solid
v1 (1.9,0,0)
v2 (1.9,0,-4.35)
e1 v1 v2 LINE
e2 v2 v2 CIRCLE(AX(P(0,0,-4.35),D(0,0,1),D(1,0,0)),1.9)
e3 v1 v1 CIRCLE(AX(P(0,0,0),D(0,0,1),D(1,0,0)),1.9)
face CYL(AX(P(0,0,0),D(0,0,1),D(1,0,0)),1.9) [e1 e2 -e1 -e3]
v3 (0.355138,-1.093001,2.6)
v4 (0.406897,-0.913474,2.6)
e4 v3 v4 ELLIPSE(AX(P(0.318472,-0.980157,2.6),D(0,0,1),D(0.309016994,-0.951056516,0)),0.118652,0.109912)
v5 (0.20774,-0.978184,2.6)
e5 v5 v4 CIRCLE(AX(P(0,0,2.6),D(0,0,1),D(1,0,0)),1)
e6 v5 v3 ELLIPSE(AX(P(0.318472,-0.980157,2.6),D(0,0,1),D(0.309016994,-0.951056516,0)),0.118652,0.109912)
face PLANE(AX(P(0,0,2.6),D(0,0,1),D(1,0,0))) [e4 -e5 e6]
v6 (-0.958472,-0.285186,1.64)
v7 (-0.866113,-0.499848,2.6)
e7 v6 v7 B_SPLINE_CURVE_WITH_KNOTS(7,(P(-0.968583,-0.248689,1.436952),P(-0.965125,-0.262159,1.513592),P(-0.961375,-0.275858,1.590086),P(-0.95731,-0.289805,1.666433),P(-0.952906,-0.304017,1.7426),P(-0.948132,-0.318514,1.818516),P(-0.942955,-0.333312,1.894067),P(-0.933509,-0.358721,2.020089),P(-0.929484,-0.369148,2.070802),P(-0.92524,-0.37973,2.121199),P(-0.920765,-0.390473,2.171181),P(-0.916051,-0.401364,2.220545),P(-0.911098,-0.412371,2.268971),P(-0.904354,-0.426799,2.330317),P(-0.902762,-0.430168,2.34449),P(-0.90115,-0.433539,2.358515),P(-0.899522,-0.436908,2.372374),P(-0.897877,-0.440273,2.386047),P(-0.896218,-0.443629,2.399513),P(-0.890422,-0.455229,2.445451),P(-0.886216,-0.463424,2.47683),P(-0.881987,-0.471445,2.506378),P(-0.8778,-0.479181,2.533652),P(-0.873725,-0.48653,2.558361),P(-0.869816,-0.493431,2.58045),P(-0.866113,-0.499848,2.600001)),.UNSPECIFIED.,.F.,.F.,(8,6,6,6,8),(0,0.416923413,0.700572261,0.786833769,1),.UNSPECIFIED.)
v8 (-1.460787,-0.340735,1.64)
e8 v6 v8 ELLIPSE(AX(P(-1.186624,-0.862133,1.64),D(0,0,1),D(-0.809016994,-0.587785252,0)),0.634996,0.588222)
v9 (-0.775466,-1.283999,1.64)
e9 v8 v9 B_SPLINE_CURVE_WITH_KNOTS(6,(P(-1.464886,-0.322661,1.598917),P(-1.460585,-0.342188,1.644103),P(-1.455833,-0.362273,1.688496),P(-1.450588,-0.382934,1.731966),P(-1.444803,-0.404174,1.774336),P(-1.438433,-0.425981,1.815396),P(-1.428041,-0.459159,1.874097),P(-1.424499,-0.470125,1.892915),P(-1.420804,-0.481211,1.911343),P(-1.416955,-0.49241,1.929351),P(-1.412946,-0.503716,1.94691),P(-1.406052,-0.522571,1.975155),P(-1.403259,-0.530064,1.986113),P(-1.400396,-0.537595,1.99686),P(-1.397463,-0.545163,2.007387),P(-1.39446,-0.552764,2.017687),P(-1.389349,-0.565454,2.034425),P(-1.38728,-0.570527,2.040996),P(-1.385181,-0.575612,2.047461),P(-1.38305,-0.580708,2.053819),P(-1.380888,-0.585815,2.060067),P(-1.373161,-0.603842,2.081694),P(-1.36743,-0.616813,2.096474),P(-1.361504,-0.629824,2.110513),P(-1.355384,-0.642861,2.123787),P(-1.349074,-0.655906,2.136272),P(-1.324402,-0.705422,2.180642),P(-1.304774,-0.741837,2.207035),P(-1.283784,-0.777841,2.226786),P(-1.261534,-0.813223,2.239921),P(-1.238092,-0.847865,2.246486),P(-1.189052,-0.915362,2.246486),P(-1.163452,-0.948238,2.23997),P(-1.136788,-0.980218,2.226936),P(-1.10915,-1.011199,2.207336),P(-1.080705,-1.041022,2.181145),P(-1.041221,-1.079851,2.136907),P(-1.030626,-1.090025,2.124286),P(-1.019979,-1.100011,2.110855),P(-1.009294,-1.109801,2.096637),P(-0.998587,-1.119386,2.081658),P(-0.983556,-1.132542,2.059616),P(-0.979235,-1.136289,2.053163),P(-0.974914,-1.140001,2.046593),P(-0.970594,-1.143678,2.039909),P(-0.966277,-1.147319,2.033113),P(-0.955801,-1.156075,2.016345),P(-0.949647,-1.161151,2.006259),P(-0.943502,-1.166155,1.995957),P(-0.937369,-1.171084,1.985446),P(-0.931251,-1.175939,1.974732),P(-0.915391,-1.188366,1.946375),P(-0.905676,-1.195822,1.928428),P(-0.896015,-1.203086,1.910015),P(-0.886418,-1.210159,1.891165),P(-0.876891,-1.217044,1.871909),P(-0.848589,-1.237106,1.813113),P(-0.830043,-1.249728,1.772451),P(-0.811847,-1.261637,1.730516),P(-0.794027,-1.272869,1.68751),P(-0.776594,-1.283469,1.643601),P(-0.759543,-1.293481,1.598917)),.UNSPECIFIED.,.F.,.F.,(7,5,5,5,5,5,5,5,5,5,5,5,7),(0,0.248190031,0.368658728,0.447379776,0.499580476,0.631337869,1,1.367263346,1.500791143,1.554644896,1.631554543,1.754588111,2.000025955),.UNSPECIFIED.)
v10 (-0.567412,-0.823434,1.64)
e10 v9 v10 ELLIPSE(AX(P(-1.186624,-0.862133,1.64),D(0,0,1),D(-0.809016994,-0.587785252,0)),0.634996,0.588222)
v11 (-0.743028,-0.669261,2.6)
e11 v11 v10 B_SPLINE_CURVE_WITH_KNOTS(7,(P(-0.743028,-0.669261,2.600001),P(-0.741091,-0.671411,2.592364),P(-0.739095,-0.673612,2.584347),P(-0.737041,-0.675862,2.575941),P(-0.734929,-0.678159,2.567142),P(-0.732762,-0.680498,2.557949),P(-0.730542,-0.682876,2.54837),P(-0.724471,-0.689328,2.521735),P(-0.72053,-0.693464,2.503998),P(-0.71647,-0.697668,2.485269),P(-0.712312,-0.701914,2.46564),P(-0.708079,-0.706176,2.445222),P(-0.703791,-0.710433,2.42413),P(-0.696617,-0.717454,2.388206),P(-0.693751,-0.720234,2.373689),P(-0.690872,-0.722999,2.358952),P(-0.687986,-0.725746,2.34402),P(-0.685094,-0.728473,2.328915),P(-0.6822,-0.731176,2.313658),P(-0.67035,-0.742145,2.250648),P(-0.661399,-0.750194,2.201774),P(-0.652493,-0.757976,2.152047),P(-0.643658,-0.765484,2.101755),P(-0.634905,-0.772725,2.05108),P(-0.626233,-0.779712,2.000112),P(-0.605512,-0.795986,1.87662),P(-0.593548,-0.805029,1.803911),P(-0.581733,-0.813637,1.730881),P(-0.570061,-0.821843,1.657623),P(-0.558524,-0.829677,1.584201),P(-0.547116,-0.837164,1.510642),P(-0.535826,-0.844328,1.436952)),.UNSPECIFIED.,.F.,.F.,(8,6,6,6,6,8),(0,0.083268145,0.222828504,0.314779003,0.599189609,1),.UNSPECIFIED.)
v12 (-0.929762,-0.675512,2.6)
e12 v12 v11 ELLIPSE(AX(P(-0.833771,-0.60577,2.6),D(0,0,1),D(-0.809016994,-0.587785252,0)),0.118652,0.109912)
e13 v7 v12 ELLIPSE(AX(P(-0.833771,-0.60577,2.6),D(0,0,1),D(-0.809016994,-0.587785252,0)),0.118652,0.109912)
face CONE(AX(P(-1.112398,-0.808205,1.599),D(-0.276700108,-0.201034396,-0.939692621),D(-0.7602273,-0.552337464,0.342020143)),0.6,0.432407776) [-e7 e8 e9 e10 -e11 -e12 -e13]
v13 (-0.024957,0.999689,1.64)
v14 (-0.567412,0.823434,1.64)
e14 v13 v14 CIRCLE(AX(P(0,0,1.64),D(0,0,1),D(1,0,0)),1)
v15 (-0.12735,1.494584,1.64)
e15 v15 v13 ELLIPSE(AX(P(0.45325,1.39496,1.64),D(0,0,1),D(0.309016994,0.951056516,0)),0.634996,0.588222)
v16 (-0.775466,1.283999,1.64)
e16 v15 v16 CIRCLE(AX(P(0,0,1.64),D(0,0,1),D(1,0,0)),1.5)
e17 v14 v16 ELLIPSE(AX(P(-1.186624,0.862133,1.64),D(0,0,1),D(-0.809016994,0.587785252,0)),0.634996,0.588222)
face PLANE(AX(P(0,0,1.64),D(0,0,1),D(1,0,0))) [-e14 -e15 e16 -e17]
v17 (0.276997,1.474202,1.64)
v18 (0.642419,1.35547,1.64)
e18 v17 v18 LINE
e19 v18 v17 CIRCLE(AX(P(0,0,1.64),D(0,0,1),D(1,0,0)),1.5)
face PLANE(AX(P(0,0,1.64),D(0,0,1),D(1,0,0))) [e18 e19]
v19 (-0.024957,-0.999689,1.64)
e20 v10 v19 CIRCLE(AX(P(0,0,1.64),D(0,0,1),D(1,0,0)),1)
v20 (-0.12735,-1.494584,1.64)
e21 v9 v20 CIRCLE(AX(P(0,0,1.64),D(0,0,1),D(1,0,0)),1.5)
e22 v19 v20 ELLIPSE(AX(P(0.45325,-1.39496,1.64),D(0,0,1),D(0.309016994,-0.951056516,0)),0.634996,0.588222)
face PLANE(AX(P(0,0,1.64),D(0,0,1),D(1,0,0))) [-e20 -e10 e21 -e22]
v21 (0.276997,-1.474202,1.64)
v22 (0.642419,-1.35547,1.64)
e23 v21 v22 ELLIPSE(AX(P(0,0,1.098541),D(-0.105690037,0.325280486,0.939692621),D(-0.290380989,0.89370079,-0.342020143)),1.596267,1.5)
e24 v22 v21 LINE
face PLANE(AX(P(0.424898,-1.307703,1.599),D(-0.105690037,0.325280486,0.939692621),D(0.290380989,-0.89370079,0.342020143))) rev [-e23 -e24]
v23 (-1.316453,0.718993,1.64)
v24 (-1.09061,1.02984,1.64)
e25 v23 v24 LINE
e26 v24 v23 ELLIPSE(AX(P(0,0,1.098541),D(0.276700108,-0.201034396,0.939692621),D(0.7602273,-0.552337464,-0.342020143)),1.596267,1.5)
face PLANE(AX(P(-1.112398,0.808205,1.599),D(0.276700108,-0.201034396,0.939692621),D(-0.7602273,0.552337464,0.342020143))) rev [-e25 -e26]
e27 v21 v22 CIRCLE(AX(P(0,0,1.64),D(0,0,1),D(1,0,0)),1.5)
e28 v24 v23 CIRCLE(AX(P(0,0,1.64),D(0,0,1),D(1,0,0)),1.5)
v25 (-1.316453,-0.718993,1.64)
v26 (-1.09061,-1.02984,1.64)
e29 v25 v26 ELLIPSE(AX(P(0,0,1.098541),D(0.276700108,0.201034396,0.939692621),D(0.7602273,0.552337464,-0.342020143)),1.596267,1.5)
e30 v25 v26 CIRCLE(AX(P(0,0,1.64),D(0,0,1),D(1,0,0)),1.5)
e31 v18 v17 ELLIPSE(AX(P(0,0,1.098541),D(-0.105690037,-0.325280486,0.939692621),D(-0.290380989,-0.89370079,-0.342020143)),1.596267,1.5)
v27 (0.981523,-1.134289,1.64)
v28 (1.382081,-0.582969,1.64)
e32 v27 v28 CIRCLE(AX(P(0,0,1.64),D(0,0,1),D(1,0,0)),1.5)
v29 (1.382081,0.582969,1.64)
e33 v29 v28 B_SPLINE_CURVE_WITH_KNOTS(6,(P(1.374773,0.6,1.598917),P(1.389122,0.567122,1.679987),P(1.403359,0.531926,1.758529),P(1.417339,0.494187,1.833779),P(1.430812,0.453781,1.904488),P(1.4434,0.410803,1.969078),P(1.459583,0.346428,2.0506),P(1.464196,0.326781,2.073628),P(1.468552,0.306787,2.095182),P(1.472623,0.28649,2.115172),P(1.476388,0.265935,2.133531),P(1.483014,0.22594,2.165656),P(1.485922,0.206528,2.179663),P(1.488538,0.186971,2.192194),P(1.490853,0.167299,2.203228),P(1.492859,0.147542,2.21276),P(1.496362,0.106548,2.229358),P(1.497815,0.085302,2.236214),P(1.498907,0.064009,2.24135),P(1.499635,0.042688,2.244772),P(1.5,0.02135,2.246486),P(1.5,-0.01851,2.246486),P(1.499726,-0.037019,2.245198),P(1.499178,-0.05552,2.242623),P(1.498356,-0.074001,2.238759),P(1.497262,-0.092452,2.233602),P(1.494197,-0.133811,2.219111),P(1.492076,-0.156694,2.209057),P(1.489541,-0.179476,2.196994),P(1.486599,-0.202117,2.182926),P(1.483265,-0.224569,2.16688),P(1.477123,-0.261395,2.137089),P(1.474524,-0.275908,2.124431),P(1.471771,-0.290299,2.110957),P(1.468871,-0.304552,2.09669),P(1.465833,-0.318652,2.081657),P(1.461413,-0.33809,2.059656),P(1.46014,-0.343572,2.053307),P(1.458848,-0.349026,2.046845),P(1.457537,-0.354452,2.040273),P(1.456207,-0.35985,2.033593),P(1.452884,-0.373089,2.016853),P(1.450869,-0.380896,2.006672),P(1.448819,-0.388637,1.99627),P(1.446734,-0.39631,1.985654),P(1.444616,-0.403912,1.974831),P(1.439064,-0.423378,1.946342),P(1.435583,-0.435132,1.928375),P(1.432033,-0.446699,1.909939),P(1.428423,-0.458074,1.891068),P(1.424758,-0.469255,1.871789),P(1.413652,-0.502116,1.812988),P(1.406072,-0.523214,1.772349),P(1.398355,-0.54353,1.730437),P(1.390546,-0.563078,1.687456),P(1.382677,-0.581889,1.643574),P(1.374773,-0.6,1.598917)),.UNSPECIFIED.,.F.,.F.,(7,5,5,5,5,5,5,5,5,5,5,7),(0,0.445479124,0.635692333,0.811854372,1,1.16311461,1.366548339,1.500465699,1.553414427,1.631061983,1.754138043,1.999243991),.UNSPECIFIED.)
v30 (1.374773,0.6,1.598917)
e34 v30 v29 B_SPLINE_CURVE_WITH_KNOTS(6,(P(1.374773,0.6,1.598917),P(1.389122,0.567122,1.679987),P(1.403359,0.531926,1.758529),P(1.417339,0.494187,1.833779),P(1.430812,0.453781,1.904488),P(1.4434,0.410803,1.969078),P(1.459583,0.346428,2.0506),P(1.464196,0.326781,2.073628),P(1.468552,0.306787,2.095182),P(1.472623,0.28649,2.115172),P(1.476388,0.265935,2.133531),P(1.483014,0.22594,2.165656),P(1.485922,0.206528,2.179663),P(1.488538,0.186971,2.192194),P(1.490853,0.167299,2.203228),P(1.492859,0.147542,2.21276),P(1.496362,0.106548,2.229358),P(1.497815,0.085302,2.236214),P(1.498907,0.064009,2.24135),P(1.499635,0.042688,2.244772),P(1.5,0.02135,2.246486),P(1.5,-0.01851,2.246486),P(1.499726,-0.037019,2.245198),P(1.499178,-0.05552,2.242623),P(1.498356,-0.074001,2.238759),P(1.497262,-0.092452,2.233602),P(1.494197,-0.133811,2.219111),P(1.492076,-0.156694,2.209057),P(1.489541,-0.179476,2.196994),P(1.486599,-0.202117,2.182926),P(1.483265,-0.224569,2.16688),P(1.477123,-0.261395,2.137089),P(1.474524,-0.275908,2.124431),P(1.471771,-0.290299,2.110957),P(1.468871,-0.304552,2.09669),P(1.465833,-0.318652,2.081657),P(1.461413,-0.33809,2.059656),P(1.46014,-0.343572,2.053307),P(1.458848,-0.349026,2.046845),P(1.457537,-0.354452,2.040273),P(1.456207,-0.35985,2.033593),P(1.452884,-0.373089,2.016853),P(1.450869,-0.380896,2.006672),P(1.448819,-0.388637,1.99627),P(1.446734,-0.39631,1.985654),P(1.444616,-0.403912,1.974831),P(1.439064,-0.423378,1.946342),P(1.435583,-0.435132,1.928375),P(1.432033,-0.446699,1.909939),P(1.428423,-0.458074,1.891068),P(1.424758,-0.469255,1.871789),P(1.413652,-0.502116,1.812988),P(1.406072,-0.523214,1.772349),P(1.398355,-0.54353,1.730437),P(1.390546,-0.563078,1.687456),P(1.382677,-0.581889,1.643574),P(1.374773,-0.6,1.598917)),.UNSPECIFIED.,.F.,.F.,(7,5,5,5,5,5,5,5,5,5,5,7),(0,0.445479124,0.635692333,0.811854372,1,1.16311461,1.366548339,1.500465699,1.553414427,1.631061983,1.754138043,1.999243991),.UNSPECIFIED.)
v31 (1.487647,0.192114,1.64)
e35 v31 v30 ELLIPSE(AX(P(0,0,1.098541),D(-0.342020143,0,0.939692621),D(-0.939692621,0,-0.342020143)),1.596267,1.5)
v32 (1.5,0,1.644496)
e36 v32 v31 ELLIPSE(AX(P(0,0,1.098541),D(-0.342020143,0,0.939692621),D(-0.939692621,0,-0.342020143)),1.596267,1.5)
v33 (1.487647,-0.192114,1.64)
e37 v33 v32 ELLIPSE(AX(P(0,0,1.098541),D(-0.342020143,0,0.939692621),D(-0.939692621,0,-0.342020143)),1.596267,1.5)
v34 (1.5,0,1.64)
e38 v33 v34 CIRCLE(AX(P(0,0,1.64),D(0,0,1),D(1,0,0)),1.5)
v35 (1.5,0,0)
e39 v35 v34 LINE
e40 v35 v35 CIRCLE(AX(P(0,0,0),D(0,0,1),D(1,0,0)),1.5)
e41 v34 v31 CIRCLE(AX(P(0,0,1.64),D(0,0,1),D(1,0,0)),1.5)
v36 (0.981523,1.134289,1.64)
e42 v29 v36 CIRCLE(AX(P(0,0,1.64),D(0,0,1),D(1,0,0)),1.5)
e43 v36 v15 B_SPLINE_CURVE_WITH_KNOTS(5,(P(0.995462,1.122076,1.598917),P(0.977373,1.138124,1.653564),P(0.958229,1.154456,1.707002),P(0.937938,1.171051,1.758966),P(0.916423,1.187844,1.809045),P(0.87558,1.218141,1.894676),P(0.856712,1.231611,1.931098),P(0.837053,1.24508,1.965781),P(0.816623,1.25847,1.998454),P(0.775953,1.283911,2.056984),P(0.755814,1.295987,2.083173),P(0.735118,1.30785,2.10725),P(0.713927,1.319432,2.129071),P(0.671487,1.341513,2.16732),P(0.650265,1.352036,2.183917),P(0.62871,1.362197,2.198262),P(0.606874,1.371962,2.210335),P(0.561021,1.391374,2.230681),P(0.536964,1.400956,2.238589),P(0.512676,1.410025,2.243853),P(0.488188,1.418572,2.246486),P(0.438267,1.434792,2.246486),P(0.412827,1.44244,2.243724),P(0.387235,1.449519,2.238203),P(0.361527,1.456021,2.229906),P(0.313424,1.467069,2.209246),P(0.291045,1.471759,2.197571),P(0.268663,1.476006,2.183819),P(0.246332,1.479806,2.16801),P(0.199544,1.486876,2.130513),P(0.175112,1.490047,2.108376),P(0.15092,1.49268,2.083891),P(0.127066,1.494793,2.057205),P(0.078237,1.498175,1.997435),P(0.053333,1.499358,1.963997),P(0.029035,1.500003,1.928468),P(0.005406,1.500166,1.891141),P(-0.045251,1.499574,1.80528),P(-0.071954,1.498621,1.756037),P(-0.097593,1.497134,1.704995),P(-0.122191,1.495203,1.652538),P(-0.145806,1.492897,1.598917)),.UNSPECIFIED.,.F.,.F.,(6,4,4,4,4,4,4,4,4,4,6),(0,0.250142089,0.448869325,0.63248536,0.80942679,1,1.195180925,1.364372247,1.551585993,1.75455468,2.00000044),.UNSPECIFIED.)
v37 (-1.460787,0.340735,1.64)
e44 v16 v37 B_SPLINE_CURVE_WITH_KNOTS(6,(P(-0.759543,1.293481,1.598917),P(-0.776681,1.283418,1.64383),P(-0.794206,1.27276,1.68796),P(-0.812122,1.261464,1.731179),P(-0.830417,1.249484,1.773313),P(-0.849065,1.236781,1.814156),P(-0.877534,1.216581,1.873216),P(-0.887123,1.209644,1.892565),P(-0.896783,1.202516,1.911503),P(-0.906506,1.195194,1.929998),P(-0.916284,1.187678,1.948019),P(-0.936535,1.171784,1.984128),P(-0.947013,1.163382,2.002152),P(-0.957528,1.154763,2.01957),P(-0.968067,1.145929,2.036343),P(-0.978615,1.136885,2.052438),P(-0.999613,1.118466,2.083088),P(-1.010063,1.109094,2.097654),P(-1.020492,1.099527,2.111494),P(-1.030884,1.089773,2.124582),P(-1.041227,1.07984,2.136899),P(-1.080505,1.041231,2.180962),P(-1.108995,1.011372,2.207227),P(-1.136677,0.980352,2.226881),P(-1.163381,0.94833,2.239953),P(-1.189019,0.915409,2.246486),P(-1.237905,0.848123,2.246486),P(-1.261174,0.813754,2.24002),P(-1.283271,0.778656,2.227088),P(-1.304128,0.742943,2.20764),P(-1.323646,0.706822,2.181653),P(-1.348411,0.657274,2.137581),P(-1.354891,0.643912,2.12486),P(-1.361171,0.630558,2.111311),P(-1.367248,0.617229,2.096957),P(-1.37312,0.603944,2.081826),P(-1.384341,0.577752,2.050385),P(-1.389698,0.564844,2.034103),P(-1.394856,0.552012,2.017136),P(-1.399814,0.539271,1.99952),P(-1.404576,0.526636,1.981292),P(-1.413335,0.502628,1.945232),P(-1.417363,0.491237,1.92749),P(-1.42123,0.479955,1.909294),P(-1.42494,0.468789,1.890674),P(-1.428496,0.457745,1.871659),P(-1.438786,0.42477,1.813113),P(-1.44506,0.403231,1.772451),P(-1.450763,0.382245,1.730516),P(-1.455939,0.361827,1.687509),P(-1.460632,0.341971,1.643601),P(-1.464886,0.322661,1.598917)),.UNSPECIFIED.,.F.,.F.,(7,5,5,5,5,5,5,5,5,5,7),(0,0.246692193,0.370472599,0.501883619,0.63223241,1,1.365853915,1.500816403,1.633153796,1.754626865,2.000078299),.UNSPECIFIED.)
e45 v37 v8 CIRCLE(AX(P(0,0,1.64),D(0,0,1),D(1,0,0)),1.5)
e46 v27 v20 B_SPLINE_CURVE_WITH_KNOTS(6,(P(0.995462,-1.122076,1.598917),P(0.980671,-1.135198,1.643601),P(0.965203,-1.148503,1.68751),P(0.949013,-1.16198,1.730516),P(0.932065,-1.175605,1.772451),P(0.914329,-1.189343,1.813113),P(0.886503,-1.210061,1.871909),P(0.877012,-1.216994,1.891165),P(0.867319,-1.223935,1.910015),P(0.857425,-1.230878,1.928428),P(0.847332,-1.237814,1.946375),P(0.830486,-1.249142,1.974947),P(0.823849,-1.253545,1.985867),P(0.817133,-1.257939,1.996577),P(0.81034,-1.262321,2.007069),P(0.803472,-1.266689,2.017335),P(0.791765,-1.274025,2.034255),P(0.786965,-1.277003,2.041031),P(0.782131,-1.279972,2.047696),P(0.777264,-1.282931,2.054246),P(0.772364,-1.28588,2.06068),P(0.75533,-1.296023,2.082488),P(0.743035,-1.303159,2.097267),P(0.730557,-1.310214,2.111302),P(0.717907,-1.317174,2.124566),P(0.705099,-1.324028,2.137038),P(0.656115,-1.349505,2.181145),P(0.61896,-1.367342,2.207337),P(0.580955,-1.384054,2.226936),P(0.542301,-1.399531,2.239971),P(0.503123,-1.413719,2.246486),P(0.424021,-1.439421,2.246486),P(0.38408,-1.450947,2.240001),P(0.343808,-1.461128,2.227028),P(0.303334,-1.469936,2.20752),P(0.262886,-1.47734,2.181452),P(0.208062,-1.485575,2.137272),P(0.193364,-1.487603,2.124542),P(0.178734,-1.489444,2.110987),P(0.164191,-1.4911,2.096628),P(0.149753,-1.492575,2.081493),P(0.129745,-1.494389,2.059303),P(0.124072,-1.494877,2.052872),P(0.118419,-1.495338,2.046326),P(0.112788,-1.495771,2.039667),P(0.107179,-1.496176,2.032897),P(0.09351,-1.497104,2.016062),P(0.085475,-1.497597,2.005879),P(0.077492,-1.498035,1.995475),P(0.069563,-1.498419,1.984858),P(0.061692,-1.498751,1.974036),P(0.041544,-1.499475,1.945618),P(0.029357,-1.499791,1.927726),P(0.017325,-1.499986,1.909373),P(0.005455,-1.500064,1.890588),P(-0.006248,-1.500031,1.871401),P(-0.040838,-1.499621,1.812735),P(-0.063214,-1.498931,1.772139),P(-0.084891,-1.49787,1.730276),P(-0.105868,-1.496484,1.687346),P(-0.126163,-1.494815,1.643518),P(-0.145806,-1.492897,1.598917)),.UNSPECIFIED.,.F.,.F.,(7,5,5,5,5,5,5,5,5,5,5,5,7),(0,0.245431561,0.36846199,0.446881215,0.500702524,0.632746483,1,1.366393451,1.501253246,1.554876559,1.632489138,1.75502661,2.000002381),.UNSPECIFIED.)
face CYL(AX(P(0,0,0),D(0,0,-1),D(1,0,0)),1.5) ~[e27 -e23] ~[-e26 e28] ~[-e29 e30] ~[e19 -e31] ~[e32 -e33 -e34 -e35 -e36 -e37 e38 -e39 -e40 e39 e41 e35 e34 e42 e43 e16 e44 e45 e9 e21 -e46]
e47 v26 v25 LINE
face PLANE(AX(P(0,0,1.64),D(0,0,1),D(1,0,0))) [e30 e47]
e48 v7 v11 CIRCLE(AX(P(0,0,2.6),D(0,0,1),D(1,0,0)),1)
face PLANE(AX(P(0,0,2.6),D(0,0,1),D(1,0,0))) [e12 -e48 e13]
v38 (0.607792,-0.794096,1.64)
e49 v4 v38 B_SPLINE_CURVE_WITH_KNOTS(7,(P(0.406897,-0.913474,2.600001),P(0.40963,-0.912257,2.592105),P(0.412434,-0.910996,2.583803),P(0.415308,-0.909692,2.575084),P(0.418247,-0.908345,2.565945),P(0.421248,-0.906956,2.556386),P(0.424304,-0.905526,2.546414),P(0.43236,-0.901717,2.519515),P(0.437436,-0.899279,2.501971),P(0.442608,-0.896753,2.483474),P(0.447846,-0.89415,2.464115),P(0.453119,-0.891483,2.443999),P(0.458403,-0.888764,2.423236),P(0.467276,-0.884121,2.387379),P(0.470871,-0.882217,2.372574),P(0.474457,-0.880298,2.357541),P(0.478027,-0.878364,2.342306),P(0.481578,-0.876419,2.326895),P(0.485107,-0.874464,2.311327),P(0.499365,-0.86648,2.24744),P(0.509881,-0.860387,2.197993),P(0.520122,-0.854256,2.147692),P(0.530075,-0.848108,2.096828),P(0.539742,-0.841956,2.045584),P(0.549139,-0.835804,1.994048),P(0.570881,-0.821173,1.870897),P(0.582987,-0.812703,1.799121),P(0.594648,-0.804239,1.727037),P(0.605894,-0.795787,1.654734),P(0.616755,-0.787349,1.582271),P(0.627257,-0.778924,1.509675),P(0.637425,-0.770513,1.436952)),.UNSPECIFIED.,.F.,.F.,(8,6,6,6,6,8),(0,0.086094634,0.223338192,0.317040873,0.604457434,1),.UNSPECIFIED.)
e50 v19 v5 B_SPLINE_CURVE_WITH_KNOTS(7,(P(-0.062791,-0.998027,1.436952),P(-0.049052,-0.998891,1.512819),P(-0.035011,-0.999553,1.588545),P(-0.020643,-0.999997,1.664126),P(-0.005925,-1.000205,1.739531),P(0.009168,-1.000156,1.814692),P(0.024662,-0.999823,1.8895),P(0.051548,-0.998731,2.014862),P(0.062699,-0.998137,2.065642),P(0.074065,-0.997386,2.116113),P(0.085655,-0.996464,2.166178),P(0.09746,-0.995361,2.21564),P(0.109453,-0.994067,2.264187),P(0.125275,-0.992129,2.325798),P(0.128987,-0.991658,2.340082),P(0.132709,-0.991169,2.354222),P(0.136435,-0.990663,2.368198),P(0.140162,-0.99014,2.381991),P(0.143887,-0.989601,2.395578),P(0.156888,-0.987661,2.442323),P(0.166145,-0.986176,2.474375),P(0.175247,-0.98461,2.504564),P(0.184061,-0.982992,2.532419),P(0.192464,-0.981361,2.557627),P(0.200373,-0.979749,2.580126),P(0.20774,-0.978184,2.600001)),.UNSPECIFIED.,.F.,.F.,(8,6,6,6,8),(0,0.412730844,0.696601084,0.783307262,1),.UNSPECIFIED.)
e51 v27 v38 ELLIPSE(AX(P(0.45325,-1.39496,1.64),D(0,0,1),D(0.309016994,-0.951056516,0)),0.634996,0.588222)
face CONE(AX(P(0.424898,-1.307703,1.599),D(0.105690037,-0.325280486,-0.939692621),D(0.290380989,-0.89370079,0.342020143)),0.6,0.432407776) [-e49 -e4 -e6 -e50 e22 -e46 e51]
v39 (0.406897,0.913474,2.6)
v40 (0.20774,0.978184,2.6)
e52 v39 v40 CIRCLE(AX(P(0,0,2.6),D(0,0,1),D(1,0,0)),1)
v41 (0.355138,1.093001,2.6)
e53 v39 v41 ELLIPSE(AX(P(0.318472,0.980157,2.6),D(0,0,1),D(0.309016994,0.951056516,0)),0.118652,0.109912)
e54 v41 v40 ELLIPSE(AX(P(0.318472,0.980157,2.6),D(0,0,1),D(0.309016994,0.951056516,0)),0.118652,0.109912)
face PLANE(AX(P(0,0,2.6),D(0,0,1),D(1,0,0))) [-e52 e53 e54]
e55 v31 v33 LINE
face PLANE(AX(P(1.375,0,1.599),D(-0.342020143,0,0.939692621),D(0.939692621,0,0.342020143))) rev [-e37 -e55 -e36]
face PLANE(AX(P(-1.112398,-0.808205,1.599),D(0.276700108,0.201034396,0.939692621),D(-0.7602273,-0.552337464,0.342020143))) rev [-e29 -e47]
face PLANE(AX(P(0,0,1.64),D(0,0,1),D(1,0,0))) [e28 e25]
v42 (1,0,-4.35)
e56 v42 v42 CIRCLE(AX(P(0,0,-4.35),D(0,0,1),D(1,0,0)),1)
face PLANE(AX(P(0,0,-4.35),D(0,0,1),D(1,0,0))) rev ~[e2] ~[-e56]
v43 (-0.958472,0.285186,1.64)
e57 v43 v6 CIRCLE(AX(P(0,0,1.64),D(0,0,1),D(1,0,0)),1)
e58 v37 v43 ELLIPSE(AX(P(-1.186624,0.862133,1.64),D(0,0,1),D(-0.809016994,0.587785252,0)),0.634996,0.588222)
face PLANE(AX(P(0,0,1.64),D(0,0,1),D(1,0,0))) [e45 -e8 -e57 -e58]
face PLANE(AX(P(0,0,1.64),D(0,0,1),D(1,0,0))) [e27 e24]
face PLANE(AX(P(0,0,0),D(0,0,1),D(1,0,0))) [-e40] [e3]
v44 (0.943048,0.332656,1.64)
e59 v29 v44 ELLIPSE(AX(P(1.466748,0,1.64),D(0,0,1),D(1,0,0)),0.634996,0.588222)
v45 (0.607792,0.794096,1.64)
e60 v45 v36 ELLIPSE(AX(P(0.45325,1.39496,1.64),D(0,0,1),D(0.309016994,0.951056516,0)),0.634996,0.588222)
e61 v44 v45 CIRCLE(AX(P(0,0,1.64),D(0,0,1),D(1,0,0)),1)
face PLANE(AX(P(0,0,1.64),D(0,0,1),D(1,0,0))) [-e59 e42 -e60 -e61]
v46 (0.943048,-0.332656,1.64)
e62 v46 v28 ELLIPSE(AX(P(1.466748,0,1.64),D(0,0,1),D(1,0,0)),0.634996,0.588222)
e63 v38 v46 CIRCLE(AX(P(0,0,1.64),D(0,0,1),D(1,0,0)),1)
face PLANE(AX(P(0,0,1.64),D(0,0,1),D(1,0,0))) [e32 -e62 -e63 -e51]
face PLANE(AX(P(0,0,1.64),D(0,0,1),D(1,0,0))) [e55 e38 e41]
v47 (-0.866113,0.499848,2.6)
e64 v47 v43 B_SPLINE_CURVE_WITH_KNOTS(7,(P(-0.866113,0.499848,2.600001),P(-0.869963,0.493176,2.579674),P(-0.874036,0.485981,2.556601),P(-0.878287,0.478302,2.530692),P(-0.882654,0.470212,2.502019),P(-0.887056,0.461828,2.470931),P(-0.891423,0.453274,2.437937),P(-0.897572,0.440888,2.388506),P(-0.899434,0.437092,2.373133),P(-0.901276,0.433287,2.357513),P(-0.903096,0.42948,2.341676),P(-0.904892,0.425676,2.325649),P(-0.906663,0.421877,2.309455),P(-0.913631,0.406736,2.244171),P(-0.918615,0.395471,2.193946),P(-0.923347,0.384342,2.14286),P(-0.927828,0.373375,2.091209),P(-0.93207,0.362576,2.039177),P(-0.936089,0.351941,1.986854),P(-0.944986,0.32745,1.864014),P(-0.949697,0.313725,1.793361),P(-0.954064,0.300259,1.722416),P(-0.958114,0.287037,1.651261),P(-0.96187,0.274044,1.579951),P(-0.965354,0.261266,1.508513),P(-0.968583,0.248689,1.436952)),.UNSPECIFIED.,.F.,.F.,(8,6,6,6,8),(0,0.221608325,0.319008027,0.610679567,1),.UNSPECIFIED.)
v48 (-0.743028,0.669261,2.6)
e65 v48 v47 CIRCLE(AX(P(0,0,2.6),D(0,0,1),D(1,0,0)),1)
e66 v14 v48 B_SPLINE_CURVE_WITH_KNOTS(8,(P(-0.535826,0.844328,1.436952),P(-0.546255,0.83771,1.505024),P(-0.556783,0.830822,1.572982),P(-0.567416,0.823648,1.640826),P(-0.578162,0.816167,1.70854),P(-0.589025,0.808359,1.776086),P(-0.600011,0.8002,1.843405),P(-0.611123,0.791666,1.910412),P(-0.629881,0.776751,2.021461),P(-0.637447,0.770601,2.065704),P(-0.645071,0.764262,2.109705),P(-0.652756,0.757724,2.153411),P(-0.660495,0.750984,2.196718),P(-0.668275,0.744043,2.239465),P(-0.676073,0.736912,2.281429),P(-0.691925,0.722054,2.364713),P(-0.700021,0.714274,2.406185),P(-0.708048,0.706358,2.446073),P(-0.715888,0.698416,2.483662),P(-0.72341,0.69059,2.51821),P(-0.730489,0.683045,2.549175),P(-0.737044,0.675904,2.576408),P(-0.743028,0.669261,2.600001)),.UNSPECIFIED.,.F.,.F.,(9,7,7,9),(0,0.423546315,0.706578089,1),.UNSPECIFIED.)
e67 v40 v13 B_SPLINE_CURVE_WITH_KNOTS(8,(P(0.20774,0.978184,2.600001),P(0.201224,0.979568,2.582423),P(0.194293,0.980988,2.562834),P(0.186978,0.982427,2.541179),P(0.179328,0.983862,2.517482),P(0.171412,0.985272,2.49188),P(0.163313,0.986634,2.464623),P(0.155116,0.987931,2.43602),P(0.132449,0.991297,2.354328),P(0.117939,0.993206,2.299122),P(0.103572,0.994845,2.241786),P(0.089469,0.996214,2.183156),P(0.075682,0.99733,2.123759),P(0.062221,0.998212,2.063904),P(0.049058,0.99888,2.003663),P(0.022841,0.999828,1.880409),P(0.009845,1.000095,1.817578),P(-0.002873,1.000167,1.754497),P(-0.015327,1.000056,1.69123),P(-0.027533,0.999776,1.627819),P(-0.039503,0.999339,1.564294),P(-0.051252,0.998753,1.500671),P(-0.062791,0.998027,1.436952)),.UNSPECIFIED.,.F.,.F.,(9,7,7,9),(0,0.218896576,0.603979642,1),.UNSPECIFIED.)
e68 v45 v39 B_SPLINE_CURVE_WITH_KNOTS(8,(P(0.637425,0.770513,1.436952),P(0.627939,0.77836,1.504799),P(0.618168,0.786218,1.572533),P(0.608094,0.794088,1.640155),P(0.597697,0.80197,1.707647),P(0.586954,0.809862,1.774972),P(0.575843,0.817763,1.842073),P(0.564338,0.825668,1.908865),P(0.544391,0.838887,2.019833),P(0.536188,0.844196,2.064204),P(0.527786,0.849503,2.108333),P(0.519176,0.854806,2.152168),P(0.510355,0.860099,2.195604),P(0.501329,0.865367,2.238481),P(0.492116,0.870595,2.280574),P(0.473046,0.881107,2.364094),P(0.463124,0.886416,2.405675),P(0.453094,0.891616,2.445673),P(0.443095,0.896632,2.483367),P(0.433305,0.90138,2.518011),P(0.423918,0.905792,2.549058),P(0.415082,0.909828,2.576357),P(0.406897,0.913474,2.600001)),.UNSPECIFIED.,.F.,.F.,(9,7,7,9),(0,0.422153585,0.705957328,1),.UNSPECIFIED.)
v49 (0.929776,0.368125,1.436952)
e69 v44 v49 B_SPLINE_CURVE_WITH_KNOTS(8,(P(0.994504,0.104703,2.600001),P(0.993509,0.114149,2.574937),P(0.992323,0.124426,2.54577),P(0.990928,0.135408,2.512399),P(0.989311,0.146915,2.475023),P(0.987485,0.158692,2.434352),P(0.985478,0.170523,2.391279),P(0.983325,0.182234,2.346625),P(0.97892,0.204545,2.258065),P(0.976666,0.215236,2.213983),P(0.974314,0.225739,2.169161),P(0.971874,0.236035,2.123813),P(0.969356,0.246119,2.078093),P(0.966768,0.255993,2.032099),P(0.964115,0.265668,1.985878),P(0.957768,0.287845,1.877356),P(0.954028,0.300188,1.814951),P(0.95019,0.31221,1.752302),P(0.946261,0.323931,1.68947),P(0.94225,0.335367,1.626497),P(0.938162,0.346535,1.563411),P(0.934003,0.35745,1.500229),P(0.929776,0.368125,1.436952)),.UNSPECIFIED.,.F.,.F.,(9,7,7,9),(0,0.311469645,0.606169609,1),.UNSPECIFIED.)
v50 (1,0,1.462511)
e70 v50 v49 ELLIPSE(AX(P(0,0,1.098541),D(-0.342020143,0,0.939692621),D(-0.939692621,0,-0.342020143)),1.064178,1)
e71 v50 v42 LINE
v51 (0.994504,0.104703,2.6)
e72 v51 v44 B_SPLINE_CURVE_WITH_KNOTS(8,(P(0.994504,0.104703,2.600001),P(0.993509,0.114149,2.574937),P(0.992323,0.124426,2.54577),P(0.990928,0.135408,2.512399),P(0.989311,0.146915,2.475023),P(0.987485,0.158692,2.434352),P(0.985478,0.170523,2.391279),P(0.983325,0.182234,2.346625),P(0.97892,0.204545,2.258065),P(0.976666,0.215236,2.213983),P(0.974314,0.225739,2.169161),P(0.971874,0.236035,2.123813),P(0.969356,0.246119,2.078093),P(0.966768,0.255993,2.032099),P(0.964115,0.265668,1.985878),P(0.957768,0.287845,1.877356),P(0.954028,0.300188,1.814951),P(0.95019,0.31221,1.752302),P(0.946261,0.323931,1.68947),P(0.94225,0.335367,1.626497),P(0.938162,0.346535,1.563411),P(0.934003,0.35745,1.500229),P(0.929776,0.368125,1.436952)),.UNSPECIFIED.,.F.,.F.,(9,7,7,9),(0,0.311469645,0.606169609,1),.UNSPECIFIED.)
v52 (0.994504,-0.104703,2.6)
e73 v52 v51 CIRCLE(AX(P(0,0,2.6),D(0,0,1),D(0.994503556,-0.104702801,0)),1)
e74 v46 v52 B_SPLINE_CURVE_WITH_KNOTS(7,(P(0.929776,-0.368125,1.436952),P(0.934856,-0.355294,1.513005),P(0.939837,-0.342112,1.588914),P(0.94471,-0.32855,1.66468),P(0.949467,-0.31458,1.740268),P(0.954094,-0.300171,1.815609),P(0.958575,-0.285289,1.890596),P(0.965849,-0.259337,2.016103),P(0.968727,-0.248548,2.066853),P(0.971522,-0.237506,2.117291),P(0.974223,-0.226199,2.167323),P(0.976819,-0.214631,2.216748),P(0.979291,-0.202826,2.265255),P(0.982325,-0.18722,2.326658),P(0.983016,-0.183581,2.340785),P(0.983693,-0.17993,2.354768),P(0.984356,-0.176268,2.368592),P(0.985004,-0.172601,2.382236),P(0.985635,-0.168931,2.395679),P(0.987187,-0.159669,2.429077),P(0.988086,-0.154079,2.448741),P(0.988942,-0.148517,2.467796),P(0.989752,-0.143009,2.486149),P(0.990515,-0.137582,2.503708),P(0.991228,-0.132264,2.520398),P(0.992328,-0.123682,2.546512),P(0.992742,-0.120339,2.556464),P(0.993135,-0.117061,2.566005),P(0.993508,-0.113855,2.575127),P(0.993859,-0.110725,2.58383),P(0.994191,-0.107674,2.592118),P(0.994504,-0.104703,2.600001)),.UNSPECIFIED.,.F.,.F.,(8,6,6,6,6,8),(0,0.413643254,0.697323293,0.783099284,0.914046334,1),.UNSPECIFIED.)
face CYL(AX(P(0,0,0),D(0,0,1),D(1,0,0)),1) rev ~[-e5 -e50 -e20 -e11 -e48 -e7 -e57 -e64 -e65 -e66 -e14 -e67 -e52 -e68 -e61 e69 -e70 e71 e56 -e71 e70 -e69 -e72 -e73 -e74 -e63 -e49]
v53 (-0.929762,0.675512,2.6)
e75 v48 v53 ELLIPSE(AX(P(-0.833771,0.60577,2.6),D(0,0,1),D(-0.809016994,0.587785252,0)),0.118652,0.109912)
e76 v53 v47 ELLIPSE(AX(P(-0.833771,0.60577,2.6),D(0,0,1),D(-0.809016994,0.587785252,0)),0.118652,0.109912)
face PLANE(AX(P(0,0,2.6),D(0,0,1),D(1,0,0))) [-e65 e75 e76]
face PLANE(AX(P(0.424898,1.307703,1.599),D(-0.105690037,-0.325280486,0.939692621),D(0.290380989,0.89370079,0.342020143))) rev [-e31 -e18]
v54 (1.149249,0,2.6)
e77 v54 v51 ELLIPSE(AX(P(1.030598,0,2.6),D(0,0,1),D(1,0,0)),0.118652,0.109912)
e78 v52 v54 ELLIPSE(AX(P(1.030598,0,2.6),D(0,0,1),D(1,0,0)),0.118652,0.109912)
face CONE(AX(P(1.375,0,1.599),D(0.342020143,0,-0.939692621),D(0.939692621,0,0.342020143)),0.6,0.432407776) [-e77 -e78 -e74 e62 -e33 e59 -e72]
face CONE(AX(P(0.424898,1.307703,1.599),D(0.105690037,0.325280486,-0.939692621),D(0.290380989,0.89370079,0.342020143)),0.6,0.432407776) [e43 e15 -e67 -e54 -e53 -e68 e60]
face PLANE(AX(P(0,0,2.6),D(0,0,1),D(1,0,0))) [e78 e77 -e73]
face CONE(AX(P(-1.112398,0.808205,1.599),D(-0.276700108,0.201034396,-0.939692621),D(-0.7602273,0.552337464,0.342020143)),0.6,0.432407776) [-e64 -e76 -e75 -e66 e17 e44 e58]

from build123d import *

# Parameters (mm, degrees)
F0_R      = 1.5
F0_R_2    = 1
F1_DEPTH  = 2.6
F5_COUNT  = 5
F5_ANGLE  = 288
F17_DEPTH = 1.64
F0_R_3    = 1.9
F18_DEPTH = 4.35


with BuildPart() as f1:
    # F0 (on Top) → F1 (new body)
    with BuildSketch(Plane.XY):
        Circle(F0_R)
        Circle(F0_R_2, mode=Mode.SUBTRACT)
    extrude(amount=F1_DEPTH)


with BuildPart() as f4:
    # F3 (on Front) → F4 (revolve)
    with BuildSketch(Plane.XZ):
        Polygon((0.9303738137, 2.820600407), (1.375, 1.599), (1.9388155725, 1.804212086), align=None)
    revolve(axis=Axis((1.1526869068, 0, 2.2098002035), (-0.3420201433, 0, 0.9396926208)))


with BuildPart() as f5_1:
    # F5: instance of F4
    add(f4.part.rotate(Axis((0, 0, 0.7995), (0, 0, 1)), 1 * F5_ANGLE / (F5_COUNT - 1)))


with BuildPart() as f5_2:
    # F5: instance of F4
    add(f4.part.rotate(Axis((0, 0, 0.7995), (0, 0, 1)), 2 * F5_ANGLE / (F5_COUNT - 1)))


with BuildPart() as f5_3:
    # F5: instance of F4
    add(f4.part.rotate(Axis((0, 0, 0.7995), (0, 0, 1)), 3 * F5_ANGLE / (F5_COUNT - 1)))


with BuildPart() as f5_4:
    # F5: instance of F4
    add(f4.part.rotate(Axis((0, 0, 0.7995), (0, 0, 1)), 4 * F5_ANGLE / (F5_COUNT - 1)))


with BuildPart() as f6_1:
    # F6: copy of F1
    add(f1.part)


with BuildPart() as f1_1:
    add(f1.part)

    # F7: intersect F4
    add(f4.part, mode=Mode.INTERSECT)



with BuildPart() as f8_1:
    # F8: copy of F6_1
    add(f6_1.part)


with BuildPart() as f9_1:
    # F9: copy of F8_1
    add(f8_1.part)


with BuildPart() as f10_1:
    # F10: copy of F9_1
    add(f9_1.part)


with BuildPart() as f5_1_1:
    add(f5_1.part)

    # F11: intersect F6_1
    add(f6_1.part, mode=Mode.INTERSECT)


with BuildPart() as f5_2_1:
    add(f5_2.part)

    # F12: intersect F8_1
    add(f8_1.part, mode=Mode.INTERSECT)


with BuildPart() as f5_3_1:
    add(f5_3.part)

    # F13: intersect F9_1
    add(f9_1.part, mode=Mode.INTERSECT)


with BuildPart() as f14_1:
    # F14: copy of F10_1
    add(f10_1.part)


with BuildPart() as f10_1_1:
    add(f10_1.part)

    # F15: intersect F5_4
    add(f5_4.part, mode=Mode.INTERSECT)


with BuildPart() as f1_2:
    add(f1_1.part)

    add(f5_1_1.part)  # F17 merges F5_1

    add(f5_2_1.part)  # F17 merges F5_2

    add(f5_3_1.part)  # F17 merges F5_3

    add(f10_1_1.part)  # F17 merges F10_1
    # F0 (on Top) → F17 (join)
    with BuildSketch(Plane.XY):
        Circle(F0_R)
        Circle(F0_R_2, mode=Mode.SUBTRACT)
    extrude(amount=F17_DEPTH)

    # F0 (on Top) → F18 (join)
    with BuildSketch(Plane.XY):
        Circle(F0_R_3)
        Circle(F0_R, mode=Mode.SUBTRACT)
        Circle(F0_R)
        Circle(F0_R_2, mode=Mode.SUBTRACT)
    extrude(amount=-F18_DEPTH)


solid = f1_2.part
